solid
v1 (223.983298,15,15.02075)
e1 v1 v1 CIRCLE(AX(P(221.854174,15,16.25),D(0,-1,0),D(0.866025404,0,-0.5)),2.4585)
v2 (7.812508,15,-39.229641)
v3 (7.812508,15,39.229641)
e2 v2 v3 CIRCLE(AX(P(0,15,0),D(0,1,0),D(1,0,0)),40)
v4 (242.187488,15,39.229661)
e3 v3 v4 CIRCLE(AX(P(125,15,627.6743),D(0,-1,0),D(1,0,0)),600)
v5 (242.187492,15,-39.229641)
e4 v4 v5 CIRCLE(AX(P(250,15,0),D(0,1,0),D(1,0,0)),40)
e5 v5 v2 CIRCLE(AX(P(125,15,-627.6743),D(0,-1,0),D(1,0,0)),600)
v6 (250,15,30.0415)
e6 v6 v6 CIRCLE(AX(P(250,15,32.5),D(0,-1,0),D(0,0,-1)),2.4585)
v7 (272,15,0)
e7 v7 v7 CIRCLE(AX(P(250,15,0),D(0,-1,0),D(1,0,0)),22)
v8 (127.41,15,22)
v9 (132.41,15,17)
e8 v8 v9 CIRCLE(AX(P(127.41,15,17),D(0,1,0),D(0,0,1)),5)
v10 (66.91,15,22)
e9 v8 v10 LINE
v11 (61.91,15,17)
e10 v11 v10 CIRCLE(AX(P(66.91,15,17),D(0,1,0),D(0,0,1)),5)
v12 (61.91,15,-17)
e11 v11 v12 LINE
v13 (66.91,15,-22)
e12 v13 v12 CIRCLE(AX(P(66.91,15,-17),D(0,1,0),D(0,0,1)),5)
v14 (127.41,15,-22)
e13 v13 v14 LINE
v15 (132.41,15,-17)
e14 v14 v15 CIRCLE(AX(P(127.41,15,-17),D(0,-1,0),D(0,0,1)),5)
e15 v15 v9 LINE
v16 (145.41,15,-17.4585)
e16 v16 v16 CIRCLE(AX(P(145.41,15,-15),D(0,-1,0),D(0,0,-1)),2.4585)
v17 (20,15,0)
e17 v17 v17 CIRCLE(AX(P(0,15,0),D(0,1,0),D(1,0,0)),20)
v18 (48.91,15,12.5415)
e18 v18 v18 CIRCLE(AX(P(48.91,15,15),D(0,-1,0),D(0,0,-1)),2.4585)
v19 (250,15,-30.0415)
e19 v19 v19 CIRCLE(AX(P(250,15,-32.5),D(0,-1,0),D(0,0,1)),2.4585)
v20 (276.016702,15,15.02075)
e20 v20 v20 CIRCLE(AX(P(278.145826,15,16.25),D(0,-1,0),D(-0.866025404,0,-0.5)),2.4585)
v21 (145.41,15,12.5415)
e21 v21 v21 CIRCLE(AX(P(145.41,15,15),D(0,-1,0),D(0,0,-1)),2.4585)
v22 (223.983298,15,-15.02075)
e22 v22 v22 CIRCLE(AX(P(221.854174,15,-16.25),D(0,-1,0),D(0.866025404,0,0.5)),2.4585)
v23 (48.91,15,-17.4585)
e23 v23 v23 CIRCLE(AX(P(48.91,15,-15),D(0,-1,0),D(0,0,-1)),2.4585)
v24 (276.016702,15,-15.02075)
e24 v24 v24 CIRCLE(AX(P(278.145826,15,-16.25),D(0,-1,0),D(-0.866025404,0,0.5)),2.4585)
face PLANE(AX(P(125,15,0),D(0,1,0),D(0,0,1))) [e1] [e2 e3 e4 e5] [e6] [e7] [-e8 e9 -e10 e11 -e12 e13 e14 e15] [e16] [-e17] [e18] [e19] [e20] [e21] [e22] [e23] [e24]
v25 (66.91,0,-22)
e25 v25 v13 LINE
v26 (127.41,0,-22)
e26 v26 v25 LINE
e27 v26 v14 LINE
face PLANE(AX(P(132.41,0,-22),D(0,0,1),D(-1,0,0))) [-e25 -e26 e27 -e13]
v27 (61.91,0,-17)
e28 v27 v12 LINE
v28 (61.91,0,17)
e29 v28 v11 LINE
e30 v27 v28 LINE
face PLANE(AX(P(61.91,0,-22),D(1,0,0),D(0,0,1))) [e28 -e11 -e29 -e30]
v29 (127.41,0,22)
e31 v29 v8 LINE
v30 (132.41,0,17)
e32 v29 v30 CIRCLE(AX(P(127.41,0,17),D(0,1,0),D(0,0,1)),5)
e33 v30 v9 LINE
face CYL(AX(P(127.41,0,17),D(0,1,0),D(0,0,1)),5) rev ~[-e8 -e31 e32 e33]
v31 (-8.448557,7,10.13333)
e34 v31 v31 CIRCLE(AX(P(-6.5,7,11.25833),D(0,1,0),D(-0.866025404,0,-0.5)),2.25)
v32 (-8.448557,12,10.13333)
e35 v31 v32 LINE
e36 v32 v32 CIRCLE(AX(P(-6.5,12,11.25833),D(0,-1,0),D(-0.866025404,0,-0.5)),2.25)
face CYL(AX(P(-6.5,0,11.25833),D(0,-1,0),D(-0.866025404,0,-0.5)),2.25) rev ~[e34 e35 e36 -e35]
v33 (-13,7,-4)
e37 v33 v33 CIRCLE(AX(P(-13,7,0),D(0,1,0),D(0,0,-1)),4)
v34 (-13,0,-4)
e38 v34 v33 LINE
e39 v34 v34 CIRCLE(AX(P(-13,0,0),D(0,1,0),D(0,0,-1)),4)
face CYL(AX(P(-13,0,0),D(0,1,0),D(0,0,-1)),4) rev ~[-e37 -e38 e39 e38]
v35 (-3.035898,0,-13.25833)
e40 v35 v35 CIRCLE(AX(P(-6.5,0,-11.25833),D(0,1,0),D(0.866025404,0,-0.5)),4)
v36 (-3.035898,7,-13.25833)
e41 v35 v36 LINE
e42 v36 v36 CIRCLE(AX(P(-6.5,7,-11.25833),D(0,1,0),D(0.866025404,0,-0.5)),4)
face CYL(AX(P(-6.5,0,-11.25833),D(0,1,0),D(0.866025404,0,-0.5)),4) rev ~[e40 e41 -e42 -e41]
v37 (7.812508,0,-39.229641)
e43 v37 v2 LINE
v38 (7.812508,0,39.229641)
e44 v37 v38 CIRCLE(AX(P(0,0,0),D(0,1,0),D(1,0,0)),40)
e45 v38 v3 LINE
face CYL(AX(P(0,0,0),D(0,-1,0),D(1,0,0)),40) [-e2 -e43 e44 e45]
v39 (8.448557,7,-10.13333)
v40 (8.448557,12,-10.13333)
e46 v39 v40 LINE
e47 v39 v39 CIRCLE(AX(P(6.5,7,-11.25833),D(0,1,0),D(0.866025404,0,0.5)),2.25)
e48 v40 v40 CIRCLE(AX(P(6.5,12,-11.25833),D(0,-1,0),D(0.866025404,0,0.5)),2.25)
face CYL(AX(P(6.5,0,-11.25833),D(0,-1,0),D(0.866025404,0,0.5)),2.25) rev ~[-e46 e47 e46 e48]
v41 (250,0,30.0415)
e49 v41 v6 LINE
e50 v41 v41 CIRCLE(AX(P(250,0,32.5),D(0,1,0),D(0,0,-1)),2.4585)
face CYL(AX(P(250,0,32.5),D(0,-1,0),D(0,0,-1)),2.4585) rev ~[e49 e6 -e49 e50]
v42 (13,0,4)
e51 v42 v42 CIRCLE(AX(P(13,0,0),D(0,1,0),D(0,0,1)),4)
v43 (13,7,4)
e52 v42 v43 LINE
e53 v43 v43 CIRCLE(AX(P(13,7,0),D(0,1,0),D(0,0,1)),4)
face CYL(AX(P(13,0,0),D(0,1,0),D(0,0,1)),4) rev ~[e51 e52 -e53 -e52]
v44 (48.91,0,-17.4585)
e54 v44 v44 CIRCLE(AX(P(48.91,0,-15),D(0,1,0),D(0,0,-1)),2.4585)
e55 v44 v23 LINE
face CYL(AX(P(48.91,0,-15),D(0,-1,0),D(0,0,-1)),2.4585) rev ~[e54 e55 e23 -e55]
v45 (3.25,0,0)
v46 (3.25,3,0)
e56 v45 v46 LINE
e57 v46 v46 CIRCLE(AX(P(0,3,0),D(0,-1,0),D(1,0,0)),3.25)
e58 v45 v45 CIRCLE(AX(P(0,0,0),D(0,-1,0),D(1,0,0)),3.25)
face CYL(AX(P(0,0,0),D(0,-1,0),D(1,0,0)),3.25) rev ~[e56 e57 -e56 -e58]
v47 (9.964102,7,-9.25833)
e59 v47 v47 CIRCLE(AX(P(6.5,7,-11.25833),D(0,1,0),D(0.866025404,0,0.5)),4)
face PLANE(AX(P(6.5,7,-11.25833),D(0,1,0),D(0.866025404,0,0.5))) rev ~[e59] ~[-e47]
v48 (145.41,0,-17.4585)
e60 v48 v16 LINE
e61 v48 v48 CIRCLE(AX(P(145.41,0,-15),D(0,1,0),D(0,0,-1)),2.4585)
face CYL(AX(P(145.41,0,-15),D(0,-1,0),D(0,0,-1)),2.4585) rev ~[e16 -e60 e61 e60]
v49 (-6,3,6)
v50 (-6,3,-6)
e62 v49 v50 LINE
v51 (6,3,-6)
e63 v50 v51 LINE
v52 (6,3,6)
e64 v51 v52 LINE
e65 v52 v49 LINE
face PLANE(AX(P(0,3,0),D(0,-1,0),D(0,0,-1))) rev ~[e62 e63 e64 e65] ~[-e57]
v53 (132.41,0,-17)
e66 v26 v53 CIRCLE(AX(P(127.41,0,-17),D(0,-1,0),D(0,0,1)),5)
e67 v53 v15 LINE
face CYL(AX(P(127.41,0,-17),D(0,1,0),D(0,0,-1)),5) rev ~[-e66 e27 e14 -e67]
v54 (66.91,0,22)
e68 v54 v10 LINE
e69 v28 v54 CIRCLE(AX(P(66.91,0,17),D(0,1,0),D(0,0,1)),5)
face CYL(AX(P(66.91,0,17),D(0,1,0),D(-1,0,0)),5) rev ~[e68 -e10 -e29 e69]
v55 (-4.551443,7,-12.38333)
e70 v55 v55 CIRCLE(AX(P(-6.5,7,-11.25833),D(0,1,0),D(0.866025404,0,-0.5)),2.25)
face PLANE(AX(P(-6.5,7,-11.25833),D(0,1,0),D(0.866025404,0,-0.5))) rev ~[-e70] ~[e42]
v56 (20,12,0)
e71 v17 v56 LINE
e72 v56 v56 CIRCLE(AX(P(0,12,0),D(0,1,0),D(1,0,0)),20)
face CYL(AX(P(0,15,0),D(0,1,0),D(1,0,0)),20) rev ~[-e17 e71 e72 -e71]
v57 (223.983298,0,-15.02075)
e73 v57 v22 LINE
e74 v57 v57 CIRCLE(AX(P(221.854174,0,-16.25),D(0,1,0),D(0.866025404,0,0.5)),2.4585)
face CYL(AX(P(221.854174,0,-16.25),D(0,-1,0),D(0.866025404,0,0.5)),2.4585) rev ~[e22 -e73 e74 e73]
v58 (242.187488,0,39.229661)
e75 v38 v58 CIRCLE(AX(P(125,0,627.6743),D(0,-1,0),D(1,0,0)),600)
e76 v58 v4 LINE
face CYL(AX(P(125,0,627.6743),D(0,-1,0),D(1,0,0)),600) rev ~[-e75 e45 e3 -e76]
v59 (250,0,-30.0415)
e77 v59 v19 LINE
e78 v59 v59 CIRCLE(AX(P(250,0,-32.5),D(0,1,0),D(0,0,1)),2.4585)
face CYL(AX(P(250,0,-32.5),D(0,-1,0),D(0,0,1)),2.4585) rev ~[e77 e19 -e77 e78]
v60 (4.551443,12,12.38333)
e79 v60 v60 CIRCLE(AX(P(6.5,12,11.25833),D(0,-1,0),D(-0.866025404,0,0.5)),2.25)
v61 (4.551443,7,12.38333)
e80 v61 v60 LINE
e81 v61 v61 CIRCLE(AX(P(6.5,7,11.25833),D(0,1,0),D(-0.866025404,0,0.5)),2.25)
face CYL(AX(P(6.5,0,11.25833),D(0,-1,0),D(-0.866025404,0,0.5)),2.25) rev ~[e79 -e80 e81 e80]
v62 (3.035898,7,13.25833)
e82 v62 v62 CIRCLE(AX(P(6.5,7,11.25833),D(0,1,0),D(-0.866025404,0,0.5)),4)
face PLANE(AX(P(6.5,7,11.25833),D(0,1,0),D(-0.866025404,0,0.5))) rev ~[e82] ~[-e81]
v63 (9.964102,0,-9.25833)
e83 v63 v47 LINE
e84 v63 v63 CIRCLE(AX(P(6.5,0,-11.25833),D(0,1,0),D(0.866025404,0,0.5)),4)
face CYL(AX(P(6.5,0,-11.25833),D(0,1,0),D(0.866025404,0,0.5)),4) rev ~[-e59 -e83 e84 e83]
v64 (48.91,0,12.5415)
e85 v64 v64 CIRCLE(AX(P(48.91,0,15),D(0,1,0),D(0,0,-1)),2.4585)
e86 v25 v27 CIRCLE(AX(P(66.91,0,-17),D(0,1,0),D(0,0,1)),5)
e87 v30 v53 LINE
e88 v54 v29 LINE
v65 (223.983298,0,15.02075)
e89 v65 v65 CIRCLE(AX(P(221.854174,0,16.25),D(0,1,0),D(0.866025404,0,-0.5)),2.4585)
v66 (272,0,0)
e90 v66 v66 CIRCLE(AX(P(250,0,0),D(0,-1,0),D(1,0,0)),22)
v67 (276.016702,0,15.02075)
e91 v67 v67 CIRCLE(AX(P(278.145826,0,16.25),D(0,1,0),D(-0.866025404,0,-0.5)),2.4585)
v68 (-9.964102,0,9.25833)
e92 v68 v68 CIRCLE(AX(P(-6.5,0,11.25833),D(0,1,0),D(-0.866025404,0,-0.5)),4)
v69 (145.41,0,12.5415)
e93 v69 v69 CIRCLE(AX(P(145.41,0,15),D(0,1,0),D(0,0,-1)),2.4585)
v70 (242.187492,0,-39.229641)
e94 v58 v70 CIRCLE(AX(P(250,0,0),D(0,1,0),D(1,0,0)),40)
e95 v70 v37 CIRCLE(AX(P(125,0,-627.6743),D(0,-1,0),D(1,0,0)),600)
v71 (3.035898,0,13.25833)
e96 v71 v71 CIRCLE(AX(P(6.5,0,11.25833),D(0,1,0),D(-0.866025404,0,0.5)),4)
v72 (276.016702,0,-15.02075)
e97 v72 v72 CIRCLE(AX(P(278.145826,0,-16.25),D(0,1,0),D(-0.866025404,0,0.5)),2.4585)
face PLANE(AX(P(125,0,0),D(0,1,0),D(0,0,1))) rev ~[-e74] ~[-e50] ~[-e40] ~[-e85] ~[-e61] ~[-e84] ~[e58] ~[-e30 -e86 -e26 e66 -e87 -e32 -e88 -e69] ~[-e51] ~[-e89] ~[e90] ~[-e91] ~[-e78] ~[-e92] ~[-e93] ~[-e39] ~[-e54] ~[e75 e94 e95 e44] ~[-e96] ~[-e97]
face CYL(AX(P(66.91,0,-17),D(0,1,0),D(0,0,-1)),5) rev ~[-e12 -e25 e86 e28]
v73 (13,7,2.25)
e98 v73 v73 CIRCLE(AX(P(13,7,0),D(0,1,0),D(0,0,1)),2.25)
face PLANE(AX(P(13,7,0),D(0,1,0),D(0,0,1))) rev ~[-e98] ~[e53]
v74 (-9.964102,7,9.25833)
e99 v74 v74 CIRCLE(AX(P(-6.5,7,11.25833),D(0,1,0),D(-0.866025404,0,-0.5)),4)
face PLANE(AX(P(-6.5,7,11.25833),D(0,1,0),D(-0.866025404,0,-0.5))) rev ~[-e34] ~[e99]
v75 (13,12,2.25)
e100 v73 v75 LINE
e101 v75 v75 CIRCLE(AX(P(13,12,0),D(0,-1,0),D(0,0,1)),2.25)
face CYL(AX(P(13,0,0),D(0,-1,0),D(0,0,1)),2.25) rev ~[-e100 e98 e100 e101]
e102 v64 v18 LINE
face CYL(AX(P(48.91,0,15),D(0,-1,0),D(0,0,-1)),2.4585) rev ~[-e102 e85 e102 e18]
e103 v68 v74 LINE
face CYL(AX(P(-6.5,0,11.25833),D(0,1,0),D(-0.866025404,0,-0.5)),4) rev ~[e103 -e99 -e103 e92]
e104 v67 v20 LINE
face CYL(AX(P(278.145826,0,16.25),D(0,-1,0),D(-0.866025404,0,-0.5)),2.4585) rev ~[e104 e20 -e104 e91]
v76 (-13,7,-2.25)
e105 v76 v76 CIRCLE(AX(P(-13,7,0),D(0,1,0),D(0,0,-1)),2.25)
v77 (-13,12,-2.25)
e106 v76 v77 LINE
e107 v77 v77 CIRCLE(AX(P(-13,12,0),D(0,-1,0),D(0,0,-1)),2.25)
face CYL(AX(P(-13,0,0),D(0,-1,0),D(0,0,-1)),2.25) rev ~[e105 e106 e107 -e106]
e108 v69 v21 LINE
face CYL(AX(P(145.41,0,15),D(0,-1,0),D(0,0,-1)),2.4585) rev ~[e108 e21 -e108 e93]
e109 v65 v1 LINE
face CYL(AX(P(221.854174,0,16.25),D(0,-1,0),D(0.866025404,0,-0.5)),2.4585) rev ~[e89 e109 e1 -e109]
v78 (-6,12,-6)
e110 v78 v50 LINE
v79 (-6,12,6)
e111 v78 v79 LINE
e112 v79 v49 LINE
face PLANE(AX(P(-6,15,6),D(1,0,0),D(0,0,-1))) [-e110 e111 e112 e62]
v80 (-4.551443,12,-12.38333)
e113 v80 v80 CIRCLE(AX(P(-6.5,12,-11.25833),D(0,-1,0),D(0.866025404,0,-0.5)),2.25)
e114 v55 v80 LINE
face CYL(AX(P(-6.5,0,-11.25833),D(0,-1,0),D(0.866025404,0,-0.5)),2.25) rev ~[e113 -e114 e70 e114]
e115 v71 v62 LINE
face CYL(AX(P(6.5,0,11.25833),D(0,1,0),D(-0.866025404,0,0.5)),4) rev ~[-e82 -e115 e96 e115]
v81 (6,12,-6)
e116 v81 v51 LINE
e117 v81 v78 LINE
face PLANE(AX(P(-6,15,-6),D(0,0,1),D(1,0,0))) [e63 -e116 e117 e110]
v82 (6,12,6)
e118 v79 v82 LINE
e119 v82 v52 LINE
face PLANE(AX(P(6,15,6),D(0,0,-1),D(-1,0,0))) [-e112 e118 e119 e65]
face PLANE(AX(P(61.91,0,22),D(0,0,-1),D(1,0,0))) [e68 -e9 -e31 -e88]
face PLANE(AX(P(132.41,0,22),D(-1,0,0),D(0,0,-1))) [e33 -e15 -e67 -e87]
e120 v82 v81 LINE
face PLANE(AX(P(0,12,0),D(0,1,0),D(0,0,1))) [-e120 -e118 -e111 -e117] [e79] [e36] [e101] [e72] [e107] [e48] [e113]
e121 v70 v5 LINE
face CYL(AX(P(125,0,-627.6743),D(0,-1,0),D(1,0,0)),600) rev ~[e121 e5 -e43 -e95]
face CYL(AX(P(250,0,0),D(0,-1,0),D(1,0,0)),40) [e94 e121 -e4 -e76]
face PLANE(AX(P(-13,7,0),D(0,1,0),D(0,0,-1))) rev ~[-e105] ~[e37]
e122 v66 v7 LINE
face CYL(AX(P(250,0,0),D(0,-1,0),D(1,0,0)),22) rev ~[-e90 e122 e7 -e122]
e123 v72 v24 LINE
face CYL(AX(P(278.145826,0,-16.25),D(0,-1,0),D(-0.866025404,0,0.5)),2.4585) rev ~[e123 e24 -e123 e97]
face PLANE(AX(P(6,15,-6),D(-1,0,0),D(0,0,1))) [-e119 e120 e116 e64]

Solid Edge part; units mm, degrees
sketch "Sketch1" plane through (0, 0, 0) normal (0, -1, 0) x (1, 0, 0)
  arc A0 (7.8125, -39.2296) -> (7.8125, 39.2296) centre (0, 0) cw
  arc A1 (7.8125, 39.2296) -> (242.1875, 39.2296) centre (125, 627.6743) ccw
  arc A2 (242.1875, 39.2296) -> (242.1875, -39.2296) centre (250, 0) cw
  arc A3 (242.1875, -39.2296) -> (7.8125, -39.2296) centre (125, -627.6743) ccw
  dimension "D1" = 39.2296
extrude "Protrusion1" add sketch "Sketch1" against normal blind 15
sketch "Sketch2" plane through (125, 0, 0) normal (0, -1, 0) x (1, 0, 0)
  circle A0 centre (125, 0) radius 22
  dimension "D1" = 44
extrude "Cutout1" cut sketch "Sketch2" against normal through all
hole "Agujero_1" at (250, 0, 32.5) direction (0, 1, 0) diameter 4.917 end up to next
pattern_circular "Pattern1" count 6 over 360 about axis through (250, 0, 0) along (0, 1, 0) of "Agujero_1"
sketch "Sketch3" plane through (125, 0, 0) normal (0, -1, 0) x (1, 0, 0)
  circle A0 centre (-125, 0) radius 3.25
  dimension "D1" = 6.5
extrude "Cutout2" cut sketch "Sketch3" against normal through all
sketch "Sketch4" plane through (125, 15, 0) normal (0, 1, 0) x (1, 0, 0)
  line L0 (-119, -6) -> (-131, -6)
  line L1 (-131, -6) -> (-131, 6)
  line L2 (-131, 6) -> (-119, 6)
  line L3 (-119, 6) -> (-119, -6)
  dimension "D1" = 12
  dimension "D2" = 12
extrude "VaciadoExtruido_3" cut sketch "Sketch4" against normal blind 12
sketch "Sketch5" plane through (125, 15, 0) normal (0, 1, 0) x (1, 0, 0)
  circle A0 centre (-125, 0) radius 20
  dimension "D1" = 40
extrude "VaciadoExtruido_4" cut sketch "Sketch5" against normal blind 3
hole "Agujero_7" at (-13, 0, 0) direction (0, 1, 0) diameter 4.5 end up to next counterbore diameter 8 counterbore depth 7
pattern_circular "Pattern2" count 6 over 360 about axis through (0, 0, 0) along (0, 1, 0) of "Agujero_7"
hole "Agujero_13" at (48.91, 0, 15) direction (0, 1, 0) diameter 4.917 end up to next
hole "Hole11" at (145.41, 0, 15) direction (0, 1, 0) diameter 4.917 end up to next
hole "Hole12" at (145.41, 0, -15) direction (0, 1, 0) diameter 4.917 end up to next
hole "Hole13" at (48.91, 0, -15) direction (0, 1, 0) diameter 4.917 end up to next
sketch "Sketch6" plane through (125, 0, 0) normal (0, -1, 0) x (1, 0, 0)
  line L0 (7.41, -22) -> (-63.09, -22)
  line L1 (-63.09, -22) -> (-63.09, 22)
  line L2 (-63.09, 22) -> (7.41, 22)
  line L3 (7.41, 22) -> (7.41, -22)
  dimension "D1" = 70.5
  dimension "D2" = 44
  dimension "D3" = 97.16
extrude "Cutout3" cut sketch "Sketch6" against normal through all
fillet "Redondeo_1" radius 5 4 edges at (61.91, 7.5, 22) (132.41, 7.5, 22) (61.91, 7.5, -22) (132.41, 7.5, -22)
properties part number "1976-1300-001" material "Aluminio, 7075-T6"
